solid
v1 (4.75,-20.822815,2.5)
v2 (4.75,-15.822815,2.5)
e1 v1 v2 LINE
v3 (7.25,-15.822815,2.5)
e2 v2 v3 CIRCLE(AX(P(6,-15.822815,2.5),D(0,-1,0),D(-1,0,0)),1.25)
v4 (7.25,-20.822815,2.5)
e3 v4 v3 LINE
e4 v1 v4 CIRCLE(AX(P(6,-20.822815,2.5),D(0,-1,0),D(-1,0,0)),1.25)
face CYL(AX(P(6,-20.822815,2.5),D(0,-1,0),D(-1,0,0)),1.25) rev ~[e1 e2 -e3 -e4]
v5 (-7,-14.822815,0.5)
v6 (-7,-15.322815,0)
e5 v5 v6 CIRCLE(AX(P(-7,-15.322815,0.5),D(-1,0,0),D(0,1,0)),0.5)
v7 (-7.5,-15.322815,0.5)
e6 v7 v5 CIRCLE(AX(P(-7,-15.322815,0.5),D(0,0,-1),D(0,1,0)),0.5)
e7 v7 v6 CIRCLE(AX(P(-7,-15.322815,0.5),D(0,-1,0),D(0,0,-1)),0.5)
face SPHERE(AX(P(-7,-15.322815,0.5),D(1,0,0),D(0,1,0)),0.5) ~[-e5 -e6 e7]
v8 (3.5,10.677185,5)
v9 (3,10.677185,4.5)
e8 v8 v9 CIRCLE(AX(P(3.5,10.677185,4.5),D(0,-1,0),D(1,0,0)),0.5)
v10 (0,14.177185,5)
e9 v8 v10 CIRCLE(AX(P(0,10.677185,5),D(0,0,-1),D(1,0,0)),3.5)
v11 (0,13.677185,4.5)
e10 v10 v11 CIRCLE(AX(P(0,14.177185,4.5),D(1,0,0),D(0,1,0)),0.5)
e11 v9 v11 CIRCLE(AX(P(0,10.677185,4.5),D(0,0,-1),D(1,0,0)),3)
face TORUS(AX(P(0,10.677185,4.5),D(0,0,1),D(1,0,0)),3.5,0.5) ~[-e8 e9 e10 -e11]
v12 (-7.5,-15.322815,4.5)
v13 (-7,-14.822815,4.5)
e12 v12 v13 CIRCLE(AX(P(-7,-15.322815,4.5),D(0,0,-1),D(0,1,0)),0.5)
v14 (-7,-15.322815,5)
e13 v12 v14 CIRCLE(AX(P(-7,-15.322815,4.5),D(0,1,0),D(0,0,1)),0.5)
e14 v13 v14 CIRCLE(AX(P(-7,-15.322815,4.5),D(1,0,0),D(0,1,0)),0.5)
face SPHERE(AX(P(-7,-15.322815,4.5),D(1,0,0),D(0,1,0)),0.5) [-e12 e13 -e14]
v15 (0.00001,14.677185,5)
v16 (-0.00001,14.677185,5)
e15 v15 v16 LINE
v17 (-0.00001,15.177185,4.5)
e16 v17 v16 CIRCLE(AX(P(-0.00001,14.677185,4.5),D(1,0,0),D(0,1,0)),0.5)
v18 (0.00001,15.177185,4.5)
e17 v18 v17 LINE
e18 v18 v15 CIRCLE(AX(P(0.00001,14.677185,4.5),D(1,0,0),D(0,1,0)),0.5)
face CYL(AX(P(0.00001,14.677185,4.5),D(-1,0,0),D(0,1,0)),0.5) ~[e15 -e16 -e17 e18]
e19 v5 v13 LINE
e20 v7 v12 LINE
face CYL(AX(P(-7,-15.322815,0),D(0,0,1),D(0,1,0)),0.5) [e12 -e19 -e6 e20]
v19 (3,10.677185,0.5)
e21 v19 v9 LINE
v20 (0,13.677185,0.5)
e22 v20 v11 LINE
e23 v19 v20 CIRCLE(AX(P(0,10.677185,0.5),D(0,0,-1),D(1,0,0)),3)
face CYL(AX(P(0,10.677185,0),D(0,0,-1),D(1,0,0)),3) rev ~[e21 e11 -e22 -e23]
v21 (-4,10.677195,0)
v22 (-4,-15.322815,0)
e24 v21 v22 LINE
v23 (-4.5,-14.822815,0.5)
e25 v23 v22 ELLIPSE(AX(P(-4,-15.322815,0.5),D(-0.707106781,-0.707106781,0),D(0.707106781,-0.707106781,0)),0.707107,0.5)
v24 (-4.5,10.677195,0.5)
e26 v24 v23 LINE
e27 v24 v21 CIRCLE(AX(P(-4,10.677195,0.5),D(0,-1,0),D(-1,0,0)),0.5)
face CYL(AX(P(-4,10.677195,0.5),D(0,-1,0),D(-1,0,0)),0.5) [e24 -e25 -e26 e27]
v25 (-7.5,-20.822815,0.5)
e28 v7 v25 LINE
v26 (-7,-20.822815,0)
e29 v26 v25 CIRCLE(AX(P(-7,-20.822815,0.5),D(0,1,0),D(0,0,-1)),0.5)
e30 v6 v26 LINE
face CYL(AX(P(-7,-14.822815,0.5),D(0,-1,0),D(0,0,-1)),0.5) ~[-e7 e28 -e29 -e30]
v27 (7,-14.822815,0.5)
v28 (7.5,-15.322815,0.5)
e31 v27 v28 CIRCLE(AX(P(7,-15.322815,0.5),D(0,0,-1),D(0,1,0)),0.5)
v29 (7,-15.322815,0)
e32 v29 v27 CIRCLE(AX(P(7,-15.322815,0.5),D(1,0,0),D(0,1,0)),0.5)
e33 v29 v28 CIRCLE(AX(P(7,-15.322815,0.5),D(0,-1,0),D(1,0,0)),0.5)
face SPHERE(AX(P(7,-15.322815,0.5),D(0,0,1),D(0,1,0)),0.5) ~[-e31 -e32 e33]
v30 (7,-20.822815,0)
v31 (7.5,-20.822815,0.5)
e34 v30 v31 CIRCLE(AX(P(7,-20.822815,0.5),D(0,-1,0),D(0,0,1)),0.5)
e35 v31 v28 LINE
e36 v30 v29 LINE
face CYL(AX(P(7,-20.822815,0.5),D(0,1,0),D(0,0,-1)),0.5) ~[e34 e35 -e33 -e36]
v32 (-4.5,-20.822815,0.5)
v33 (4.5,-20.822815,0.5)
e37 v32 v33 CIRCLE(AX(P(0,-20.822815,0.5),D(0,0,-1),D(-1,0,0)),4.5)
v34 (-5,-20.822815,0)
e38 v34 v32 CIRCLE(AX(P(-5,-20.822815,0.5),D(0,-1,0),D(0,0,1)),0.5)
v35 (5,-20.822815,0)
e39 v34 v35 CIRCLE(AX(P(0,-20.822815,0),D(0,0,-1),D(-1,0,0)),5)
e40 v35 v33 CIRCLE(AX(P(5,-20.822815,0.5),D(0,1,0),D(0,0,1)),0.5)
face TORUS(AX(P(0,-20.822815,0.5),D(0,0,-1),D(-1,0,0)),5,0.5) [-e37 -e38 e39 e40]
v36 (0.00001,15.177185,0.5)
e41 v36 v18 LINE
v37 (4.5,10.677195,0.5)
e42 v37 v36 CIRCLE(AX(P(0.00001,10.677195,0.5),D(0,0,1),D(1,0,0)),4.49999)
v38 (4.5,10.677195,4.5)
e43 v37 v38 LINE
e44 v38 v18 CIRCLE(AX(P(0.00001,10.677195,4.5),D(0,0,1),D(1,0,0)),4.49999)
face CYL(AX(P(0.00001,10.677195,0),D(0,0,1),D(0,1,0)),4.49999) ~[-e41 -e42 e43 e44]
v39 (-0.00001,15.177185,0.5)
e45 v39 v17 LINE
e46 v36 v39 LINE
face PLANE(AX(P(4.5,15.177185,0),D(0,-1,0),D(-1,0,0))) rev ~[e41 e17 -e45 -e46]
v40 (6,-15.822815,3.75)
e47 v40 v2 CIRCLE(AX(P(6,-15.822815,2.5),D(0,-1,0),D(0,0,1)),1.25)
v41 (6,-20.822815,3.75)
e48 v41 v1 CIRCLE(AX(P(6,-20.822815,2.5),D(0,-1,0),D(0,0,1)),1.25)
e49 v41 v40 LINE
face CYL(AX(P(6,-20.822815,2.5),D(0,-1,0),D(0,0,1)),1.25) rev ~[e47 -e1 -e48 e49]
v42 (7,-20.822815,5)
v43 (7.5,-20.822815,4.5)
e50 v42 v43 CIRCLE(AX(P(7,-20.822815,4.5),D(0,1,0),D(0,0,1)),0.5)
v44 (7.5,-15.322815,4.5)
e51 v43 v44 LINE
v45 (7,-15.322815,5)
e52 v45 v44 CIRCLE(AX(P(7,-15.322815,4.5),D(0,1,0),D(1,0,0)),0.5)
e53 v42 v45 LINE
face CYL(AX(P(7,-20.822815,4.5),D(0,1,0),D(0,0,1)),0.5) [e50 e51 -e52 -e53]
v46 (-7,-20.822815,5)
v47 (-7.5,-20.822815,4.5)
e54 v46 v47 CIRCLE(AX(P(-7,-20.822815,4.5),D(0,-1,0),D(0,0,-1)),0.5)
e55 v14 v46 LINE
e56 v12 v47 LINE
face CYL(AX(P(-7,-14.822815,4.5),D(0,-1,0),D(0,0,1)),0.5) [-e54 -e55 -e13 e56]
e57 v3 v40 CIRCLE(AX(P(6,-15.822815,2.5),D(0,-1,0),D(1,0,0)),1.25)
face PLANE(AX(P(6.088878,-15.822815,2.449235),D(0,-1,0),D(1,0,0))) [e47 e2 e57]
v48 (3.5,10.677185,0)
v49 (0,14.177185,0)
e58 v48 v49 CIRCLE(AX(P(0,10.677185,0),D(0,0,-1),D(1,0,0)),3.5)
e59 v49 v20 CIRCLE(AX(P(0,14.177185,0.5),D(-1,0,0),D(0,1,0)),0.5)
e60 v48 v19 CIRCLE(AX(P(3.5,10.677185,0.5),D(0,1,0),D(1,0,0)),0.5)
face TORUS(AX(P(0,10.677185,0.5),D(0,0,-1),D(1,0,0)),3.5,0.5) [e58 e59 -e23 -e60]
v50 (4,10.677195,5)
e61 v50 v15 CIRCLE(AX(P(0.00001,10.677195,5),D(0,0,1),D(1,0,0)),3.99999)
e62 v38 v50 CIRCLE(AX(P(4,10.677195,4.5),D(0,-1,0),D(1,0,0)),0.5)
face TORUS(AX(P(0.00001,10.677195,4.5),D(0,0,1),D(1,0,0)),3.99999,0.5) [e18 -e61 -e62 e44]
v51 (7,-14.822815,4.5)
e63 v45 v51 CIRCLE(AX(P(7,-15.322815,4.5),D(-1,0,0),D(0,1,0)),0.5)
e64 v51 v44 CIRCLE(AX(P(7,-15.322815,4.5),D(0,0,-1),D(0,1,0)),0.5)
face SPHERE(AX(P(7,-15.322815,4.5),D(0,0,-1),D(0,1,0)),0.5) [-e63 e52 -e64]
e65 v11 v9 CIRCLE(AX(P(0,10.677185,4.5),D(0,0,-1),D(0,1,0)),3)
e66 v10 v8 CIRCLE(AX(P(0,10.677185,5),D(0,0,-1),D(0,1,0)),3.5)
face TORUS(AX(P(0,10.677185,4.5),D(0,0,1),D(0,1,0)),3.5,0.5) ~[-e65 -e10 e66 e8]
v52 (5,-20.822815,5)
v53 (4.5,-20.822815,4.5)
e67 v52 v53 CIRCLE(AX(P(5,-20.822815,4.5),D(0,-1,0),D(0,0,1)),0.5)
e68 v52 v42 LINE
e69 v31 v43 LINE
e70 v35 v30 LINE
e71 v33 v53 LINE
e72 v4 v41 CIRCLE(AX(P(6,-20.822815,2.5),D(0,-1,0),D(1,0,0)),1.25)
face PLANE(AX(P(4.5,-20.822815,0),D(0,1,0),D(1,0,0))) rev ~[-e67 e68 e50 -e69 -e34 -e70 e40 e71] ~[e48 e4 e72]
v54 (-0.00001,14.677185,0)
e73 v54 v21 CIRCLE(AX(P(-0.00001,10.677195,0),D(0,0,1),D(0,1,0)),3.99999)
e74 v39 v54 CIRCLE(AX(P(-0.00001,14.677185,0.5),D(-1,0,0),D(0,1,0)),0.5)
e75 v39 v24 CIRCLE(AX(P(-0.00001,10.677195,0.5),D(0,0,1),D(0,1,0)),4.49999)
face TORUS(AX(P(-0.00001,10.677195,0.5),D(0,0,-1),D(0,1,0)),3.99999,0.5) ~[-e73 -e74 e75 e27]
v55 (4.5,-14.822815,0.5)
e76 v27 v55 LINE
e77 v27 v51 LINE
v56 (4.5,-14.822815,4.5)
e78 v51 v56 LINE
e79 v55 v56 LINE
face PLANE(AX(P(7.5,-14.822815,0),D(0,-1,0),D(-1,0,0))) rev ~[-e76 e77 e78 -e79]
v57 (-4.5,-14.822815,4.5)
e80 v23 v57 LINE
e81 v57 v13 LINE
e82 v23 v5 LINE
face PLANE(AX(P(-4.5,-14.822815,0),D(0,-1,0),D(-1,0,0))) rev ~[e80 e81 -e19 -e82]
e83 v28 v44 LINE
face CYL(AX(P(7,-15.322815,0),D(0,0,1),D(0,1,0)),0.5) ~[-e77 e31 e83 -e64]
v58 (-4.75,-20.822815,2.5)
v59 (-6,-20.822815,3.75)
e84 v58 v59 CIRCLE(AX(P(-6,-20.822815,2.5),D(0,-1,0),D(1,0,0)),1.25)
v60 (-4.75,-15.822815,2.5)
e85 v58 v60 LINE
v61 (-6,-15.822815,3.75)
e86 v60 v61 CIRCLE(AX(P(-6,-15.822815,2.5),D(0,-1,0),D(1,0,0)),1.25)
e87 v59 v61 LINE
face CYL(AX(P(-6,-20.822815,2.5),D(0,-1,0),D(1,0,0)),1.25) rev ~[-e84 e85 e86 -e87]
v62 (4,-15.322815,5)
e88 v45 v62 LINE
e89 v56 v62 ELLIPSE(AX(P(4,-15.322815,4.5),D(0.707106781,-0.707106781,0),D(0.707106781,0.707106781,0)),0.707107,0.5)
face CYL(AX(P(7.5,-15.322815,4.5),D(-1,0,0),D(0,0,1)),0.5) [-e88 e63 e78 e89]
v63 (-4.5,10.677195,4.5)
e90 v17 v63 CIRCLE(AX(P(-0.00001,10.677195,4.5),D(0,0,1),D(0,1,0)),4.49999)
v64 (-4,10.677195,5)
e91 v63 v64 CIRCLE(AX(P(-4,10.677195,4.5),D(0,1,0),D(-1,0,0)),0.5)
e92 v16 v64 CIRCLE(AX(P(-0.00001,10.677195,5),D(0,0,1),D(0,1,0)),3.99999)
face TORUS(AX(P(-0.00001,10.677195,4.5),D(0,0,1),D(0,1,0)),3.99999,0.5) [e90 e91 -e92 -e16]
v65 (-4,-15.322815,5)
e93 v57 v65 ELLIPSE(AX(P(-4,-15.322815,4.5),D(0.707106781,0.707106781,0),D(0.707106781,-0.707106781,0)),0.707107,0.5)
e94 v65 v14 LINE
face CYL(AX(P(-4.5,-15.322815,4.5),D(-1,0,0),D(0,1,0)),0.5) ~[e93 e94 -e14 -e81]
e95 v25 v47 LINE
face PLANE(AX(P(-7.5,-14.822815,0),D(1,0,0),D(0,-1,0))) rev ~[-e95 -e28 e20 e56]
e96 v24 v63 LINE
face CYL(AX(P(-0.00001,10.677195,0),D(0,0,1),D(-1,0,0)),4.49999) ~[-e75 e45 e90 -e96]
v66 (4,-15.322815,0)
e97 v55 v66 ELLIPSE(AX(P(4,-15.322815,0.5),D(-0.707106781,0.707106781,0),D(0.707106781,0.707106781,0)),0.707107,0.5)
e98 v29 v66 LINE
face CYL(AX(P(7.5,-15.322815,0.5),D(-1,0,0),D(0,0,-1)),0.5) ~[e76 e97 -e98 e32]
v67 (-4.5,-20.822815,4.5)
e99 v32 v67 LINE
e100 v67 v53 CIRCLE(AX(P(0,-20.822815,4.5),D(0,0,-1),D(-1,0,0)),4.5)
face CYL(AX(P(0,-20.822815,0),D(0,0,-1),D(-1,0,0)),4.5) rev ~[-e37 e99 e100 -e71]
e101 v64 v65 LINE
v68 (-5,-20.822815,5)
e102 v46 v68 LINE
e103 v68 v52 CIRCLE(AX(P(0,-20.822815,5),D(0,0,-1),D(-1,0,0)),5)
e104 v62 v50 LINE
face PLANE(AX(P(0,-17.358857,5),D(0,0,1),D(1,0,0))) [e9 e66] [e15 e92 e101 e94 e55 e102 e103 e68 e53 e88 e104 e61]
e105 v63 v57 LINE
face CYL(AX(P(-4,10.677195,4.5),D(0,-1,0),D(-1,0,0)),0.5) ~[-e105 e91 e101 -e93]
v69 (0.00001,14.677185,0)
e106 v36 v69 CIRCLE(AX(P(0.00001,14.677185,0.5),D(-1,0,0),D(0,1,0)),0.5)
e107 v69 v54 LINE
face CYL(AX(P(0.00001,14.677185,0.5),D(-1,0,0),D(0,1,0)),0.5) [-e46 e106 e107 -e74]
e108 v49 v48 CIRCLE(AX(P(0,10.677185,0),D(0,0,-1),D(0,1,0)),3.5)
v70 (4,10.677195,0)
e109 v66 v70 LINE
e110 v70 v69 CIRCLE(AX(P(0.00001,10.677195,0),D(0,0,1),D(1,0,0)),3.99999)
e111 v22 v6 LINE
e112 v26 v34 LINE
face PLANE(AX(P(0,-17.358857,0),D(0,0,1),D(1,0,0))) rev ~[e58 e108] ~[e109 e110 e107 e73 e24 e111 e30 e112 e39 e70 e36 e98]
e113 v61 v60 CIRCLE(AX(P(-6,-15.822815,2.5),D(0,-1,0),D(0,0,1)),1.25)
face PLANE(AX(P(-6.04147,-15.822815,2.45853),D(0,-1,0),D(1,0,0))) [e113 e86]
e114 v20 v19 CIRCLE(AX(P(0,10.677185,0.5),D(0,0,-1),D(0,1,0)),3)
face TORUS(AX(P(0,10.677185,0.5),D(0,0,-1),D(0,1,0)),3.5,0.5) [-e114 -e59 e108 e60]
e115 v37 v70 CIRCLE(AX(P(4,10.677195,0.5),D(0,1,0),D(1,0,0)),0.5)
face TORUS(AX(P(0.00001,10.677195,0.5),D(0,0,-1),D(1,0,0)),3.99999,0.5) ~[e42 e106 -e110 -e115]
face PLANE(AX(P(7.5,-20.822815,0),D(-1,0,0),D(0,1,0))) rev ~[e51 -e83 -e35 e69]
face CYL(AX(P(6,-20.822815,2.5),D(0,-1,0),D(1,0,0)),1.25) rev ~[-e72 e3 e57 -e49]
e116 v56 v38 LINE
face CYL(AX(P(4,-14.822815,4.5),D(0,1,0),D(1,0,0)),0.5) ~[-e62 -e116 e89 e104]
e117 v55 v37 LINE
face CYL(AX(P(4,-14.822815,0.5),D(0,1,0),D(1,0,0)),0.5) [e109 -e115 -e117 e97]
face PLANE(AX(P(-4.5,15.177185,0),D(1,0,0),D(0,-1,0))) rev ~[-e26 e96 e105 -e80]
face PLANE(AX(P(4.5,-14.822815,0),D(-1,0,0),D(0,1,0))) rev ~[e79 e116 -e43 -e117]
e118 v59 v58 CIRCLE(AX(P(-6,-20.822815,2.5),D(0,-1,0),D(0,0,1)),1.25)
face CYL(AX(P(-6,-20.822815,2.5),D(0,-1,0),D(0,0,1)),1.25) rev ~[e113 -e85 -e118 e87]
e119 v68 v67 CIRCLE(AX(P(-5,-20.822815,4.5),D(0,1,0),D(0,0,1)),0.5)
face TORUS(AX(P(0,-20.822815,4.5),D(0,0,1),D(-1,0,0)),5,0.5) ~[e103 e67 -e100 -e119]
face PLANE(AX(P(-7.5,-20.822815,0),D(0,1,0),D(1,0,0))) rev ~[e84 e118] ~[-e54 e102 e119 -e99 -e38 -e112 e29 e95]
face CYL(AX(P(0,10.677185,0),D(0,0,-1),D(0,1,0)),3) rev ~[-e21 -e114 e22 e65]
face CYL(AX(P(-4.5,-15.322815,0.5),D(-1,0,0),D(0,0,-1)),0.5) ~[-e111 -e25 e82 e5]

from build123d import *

# Parameters (mm, degrees)
F1_DEPTH = 5
F2_R     = 4.49999
F3_R     = 0.5
F5_DEPTH = 5


# Not quite as in the source:
# - a fillet or chamfer is up to 0.001 mm smaller than in the source, because OpenCascade refuses the exact size
# - a feature names something its author has since deleted; it is built from what else it names


with BuildPart() as f1:
    # F0 (on Top) → F1 (new body)
    with BuildSketch(Plane.XY):
        with BuildLine():
            Line((4.5, -14.8228148893), (-4.5, -14.8228148893))
            Line((-4.5, -14.8228148893), (-7.5, -14.8228148893))
            Line((-7.5, -14.8228148893), (-7.5, -20.8228148893))
            Line((-7.5, -20.8228148893), (-4.5, -20.8228148893))
            ThreePointArc((-4.5, -20.8228148893), (0, -16.3228148893), (4.5, -20.8228148893))
            Line((4.5, -20.8228148893), (7.5, -20.8228148893))
            Line((7.5, -20.8228148893), (7.5, -14.8228148893))
            Line((7.5, -14.8228148893), (4.5, -14.8228148893))
        make_face()
        Polygon((0, 15.1771851107), (-4.5, 15.1771851107), (-4.5, -14.8228148893), (4.5, -14.8228148893), (4.5, 15.1771851107), align=None)
        with BuildLine():
            ThreePointArc((3, 10.6771851107), (-2.1213203436, 8.5558647672), (0, 13.6771851107))
            ThreePointArc((0, 13.6771851107), (2.1213203436, 12.7985054543), (3, 10.6771851107))
        make_face(mode=Mode.SUBTRACT)
    extrude(amount=F1_DEPTH)

    # F2 (radius 4.5 in the source; OpenCascade refuses exactly that, so slightly less here)
    f2_edges = [f1.edges().sort_by_distance(p)[0] for p in [
        (4.5, 15.177185, 2.5),
        (-4.5, 15.177185, 2.5),
    ]]
    fillet(f2_edges, radius=F2_R)

    # F3
    f3_edges = [f1.edges().sort_by_distance(p)[0] for p in [
        (-4.5, -2.07281, 5),
        (-4.5, -2.07281, 0),
        (-6, -14.822815, 5),
        (-6, -14.822815, 0),
        (-7.5, -14.822815, 2.5),
        (7.5, -14.822815, 2.5),
        (6, -14.822815, 0),
        (6, -14.822815, 5),
        (-7.5, -17.822815, 0),
        (-7.5, -17.822815, 5),
        (7.5, -17.822815, 5),
        (7.5, -17.822815, 0),
        (-3, 10.677185, 5),
        (-3, 10.677185, 0),
        (0, -16.322815, 5),
        (0, -16.322815, 0),
        (4.5, -2.07281, 0),
        (4.5, -2.07281, 5),
        (3.181983, 13.859169, 0),
        (0, 15.177185, 0),
        (-3.181983, 13.859169, 0),
        (3.181983, 13.859169, 5),
        (0, 15.177185, 5),
        (-3.181983, 13.859169, 5),
    ]]
    fillet(f3_edges, radius=F3_R)

    # F4 (on face) → F5 (cut)
    with BuildSketch(Plane.XZ.offset(20.8228148893)):
        with BuildLine():
            ThreePointArc((7.25, 2.5), (6.8838834765, 3.3838834765), (6, 3.75))
            Line((6, 3.75), (6, 2.5))
            Line((6, 2.5), (4.75, 2.5))
            ThreePointArc((4.75, 2.5), (6, 1.25), (7.25, 2.5))
        make_face()
        with BuildLine():
            Line((6, 2.5), (6, 3.75))
            ThreePointArc((6, 3.75), (5.1161165235, 3.3838834765), (4.75, 2.5))
            Line((4.75, 2.5), (6, 2.5))
        make_face()
        with BuildLine():
            Line((-6, 2.5), (-6, 3.75))
            ThreePointArc((-6, 3.75), (-6.8838834765, 1.6161165235), (-4.75, 2.5))
            Line((-4.75, 2.5), (-6, 2.5))
        make_face()
        with BuildLine():
            ThreePointArc((-4.75, 2.5), (-5.1161165235, 3.3838834765), (-6, 3.75))
            Line((-6, 3.75), (-6, 2.5))
            Line((-6, 2.5), (-4.75, 2.5))
        make_face()
    extrude(amount=-F5_DEPTH, mode=Mode.SUBTRACT)


solid = f1.part
